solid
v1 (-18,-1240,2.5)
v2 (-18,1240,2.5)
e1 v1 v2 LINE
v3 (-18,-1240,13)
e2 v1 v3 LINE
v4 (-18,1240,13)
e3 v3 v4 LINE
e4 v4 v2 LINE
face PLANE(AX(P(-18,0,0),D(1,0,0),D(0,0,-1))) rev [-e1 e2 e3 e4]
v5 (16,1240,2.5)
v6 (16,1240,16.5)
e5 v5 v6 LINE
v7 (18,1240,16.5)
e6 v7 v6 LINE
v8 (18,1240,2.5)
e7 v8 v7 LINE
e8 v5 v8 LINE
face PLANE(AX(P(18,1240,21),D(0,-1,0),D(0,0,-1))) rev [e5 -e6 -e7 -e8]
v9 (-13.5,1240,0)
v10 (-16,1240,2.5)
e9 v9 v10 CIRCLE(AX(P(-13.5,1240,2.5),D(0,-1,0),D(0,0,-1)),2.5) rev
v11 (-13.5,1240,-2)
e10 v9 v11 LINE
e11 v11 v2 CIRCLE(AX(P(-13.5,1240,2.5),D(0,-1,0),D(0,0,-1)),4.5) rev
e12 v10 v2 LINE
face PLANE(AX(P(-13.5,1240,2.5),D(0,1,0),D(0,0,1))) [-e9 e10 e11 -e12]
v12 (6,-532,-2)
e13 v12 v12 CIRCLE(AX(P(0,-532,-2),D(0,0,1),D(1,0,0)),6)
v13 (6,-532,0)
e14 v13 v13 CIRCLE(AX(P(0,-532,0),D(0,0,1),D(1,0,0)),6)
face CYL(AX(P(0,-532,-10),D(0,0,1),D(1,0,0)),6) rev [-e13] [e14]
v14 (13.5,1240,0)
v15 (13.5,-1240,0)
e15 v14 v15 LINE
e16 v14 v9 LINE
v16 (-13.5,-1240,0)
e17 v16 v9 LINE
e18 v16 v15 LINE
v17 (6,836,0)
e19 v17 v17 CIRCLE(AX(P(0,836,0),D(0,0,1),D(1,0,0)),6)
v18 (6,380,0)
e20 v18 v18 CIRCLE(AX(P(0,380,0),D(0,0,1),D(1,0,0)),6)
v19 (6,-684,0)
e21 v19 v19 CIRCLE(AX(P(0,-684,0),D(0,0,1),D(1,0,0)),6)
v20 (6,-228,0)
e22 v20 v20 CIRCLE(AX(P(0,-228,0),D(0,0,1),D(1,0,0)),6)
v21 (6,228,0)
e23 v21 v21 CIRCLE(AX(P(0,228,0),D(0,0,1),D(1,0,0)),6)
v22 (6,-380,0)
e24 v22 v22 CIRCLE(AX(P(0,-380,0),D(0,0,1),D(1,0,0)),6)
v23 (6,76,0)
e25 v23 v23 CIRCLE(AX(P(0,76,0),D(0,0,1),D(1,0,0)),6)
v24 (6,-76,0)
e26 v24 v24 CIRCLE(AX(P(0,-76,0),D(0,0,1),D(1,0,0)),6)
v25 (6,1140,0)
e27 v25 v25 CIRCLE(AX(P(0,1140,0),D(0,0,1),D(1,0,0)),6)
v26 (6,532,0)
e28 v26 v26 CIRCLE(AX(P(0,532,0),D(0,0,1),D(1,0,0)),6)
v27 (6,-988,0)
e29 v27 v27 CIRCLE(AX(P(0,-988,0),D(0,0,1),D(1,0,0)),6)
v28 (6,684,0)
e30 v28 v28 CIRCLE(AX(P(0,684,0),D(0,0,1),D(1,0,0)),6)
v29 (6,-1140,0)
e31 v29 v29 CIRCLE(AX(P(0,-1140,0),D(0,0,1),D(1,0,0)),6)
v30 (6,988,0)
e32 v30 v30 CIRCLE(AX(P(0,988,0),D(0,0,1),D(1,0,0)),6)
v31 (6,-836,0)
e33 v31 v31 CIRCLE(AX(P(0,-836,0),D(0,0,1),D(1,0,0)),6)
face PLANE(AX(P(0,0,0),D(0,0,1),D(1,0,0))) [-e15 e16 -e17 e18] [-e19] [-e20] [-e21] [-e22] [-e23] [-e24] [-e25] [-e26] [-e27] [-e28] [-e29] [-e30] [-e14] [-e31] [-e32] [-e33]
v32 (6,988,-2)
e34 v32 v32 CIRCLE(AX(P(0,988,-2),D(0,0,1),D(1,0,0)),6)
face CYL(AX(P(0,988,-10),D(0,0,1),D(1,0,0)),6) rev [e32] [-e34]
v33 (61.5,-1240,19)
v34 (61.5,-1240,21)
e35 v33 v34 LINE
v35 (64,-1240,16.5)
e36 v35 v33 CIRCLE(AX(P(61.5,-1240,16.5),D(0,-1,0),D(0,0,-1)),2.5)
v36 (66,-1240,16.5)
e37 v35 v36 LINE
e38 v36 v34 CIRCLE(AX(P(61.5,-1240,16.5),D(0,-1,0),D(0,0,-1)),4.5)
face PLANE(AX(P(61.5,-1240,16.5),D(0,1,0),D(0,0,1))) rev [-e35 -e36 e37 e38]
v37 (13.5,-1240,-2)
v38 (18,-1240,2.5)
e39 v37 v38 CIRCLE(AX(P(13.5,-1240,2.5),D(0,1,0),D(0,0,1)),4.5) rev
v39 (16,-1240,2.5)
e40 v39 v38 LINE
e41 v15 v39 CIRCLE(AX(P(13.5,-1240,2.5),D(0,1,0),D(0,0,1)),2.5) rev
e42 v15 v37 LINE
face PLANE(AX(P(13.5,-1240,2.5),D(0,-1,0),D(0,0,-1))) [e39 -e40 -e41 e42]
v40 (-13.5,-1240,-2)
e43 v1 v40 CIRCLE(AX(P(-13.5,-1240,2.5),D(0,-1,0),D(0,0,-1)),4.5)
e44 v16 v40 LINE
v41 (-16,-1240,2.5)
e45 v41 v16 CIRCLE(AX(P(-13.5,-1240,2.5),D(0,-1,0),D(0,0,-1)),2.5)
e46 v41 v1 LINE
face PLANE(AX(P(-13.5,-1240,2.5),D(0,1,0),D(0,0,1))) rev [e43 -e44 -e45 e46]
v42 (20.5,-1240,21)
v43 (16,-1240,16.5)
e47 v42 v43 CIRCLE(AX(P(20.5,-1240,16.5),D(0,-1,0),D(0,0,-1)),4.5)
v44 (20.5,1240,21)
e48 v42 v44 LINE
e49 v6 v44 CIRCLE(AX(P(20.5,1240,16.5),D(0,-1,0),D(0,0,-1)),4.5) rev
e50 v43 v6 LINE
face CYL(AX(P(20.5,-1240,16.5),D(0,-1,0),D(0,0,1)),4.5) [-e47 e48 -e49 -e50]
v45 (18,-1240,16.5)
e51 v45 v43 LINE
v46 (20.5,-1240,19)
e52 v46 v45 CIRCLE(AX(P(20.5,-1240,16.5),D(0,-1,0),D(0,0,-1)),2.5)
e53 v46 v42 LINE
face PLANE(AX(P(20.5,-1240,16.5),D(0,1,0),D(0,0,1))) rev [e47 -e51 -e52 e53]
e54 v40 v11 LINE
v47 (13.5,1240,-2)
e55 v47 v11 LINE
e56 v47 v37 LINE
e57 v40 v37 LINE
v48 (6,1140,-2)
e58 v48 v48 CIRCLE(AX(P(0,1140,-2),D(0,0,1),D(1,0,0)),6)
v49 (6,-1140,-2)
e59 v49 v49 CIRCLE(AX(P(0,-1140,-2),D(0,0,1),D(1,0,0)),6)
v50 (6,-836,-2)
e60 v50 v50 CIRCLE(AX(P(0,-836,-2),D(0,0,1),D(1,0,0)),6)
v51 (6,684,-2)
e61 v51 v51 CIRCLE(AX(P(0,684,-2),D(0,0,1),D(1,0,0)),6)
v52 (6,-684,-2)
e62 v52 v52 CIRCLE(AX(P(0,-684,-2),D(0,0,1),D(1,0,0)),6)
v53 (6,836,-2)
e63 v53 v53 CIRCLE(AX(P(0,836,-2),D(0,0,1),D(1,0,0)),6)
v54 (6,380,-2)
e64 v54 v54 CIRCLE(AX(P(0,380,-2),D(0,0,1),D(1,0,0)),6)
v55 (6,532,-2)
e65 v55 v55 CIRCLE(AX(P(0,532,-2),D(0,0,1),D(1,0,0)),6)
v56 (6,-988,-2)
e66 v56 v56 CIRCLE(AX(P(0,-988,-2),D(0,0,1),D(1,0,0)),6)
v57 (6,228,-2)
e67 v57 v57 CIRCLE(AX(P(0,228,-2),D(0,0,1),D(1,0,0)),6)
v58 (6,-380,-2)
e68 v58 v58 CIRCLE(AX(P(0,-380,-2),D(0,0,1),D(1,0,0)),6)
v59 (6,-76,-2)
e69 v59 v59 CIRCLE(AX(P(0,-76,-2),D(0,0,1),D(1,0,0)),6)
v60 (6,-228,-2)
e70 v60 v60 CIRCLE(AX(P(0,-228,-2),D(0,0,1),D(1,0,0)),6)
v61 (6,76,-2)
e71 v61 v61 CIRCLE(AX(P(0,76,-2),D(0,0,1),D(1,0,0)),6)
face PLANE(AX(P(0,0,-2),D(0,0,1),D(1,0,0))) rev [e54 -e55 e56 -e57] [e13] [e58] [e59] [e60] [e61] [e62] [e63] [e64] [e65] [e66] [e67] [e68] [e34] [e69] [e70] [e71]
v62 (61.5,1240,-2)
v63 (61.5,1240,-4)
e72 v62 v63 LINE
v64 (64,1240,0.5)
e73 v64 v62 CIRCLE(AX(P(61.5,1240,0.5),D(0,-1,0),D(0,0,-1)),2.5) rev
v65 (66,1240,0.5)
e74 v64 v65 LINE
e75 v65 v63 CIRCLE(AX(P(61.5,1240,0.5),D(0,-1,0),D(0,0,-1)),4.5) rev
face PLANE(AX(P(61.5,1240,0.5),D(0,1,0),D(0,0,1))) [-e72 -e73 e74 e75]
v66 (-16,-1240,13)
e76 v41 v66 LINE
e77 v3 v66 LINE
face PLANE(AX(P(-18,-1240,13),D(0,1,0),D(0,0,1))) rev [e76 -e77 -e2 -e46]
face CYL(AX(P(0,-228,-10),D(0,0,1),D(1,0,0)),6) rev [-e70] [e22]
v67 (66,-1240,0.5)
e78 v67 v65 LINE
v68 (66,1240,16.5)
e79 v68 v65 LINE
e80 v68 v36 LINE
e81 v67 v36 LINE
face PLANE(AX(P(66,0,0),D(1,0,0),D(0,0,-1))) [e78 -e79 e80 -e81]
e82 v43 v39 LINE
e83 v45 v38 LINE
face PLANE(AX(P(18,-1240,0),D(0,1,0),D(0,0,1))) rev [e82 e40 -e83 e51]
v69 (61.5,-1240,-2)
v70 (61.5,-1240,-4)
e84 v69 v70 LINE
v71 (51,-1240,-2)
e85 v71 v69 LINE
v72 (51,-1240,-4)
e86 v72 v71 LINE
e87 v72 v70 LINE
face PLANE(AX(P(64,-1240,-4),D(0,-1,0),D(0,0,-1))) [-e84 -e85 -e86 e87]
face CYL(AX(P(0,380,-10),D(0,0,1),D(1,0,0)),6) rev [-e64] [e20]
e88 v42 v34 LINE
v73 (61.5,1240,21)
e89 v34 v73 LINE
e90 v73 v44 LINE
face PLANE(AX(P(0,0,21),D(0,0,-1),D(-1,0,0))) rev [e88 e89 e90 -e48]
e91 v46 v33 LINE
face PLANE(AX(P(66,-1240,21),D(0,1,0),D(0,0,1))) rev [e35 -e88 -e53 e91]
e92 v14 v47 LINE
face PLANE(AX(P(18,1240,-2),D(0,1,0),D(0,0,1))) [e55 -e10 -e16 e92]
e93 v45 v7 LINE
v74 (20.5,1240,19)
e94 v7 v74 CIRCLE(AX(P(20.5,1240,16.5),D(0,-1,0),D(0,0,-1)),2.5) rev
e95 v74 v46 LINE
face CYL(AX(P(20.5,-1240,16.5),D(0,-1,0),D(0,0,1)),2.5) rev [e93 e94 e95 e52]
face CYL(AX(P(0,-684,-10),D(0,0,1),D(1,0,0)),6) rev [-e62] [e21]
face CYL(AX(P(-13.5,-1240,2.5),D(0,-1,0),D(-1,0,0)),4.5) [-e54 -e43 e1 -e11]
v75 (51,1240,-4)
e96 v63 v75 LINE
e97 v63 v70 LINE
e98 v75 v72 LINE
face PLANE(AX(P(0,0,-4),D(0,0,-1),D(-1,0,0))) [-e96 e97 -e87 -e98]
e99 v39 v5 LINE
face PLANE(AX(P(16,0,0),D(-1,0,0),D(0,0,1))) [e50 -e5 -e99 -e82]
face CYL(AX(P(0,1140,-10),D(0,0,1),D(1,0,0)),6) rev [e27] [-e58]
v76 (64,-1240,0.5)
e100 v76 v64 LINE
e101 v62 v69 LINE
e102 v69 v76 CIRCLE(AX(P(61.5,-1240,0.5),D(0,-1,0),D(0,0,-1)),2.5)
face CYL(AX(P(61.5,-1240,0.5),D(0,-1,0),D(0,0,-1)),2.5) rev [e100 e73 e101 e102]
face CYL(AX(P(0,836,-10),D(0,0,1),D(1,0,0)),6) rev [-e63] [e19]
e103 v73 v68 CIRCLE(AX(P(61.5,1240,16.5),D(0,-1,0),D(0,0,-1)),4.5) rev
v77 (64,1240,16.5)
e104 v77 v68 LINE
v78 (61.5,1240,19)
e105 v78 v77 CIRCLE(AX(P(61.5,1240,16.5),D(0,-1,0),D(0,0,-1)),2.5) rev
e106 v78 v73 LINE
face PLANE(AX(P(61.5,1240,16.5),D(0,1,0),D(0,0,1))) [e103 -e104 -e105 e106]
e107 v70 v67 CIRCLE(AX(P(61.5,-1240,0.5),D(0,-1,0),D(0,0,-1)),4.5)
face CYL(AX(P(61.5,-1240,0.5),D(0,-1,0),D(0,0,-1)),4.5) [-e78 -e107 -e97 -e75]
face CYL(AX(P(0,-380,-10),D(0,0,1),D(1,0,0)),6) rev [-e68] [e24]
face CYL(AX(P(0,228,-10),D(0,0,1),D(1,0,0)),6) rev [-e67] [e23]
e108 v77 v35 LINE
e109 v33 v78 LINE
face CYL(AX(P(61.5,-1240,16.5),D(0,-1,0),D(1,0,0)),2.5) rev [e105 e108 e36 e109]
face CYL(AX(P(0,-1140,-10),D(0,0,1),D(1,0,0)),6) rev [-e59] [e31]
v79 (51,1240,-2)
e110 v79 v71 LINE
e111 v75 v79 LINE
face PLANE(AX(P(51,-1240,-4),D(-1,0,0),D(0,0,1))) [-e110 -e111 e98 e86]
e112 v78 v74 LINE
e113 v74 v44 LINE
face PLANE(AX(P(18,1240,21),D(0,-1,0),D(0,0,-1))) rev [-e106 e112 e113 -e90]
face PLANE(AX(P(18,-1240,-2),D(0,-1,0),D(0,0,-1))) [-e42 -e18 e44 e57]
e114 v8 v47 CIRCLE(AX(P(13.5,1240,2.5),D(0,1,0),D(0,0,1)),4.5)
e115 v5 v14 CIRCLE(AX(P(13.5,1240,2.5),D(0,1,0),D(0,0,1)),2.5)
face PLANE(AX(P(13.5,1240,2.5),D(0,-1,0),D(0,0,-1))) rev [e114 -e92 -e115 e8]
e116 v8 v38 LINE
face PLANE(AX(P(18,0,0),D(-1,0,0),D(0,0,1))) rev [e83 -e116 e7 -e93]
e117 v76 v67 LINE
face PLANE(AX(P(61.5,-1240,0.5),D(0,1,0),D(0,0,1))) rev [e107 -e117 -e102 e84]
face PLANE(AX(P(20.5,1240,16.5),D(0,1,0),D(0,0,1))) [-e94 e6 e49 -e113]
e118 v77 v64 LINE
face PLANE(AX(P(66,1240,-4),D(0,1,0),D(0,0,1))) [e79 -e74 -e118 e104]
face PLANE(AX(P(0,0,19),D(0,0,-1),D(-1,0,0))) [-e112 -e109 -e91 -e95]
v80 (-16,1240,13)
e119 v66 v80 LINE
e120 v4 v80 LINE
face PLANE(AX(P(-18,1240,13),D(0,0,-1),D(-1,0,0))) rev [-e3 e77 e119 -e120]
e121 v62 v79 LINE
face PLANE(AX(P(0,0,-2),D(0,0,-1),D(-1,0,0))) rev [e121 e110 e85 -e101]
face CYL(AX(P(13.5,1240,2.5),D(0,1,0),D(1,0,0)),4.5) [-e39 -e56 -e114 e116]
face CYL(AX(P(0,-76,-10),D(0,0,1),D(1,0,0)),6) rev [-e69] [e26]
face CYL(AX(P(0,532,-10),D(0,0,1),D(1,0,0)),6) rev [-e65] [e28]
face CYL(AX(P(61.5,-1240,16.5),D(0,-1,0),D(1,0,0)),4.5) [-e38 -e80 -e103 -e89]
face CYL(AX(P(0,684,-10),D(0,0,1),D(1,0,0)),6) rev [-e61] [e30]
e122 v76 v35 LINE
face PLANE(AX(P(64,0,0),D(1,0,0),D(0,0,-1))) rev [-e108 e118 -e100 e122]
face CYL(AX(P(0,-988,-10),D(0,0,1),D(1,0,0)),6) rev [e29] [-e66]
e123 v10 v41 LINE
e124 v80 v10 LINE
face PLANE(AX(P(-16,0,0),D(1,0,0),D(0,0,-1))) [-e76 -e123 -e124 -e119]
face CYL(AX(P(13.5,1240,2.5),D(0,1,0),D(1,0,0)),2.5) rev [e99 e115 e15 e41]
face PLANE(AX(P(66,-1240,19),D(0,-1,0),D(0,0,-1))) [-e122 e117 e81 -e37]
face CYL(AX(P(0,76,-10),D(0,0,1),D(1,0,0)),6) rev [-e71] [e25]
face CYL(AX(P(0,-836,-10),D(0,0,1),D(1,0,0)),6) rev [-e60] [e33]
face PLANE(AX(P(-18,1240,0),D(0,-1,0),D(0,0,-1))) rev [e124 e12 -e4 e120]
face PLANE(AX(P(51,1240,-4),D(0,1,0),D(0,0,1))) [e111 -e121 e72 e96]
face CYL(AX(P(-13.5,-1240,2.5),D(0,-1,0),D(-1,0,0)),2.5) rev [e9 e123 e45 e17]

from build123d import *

# Parameters (mm, degrees)
SKETCH1_W                    = 36
SKETCH1_H                    = 2480
BASE_FLANGE1_DEPTH           = 2
EDGE_FLANGE1_STRIP_W         = 13
EDGE_FLANGE1_STRIP_H         = 2
EDGE_FLANGE1_STRIP_CUT_DEPTH = 2480
EDGE_FLANGE1_DEPTH           = 2480
EDGE_FLANGE2_STRIP_W         = 13
EDGE_FLANGE2_STRIP_H         = 2
EDGE_FLANGE2_STRIP_CUT_DEPTH = 2480
EDGE_FLANGE2_DEPTH           = 2480
EDGE_FLANGE3_STRIP_W         = 13
EDGE_FLANGE3_STRIP_H         = 2
EDGE_FLANGE3_STRIP_CUT_DEPTH = 2480
EDGE_FLANGE3_DEPTH           = 2480
EDGE_FLANGE4_STRIP_W         = 13
EDGE_FLANGE4_STRIP_H         = 2
EDGE_FLANGE4_STRIP_CUT_DEPTH = 2480
EDGE_FLANGE4_DEPTH           = 2480
EDGE_FLANGE5_STRIP_W         = 13
EDGE_FLANGE5_STRIP_H         = 2
EDGE_FLANGE5_STRIP_CUT_DEPTH = 2480
EDGE_FLANGE5_DEPTH           = 2480
SKETCH21_R                   = 6
CUT_EXTRUDE1_DEPTH           = 10
LPATTERN1_COUNT              = 16
LPATTERN1_PITCH              = 152


# Sheet-metal steps are written as plain solids
with BuildPart() as part:
    # Sketch1 → Base-Flange1 (new body)
    with BuildSketch(Plane.XY):
        Rectangle(SKETCH1_W, SKETCH1_H)
    extrude(amount=-BASE_FLANGE1_DEPTH)

    # Edge-Flange1 strip (across the edge) → Edge-Flange1 strip cut (cut)
    with BuildSketch(Plane(origin=(-18, 1240, 0), x_dir=(1, 0, 0), z_dir=(0, -1, 0))):
        with Locations((-2, -1)):
            Rectangle(EDGE_FLANGE1_STRIP_W, EDGE_FLANGE1_STRIP_H)
    extrude(amount=EDGE_FLANGE1_STRIP_CUT_DEPTH, mode=Mode.SUBTRACT)

    # Edge-Flange1 section (across the edge) → Edge-Flange1 (add)
    with BuildSketch(Plane(origin=(-18, 1240, 0), x_dir=(1, 0, 0), z_dir=(0, -1, 0))):
        with BuildLine():
            Line((0, 2.5), (0, 13))
            Line((0, 13), (2, 13))
            Line((2, 13), (2, 2.5))
            ThreePointArc((2, 2.5), (2.732233047, 0.732233047), (4.5, 0))
            Line((4.5, 0), (4.5, -2))
            ThreePointArc((4.5, -2), (1.318019485, -0.681980515), (0, 2.5))
        make_face()
    extrude(amount=EDGE_FLANGE1_DEPTH)

    # Edge-Flange2 strip (across the edge) → Edge-Flange2 strip cut (cut)
    with BuildSketch(Plane(origin=(18, -1240, 0), x_dir=(-1, 0, 0), z_dir=(0, 1, 0))):
        with Locations((-2, -1)):
            Rectangle(EDGE_FLANGE2_STRIP_W, EDGE_FLANGE2_STRIP_H)
    extrude(amount=EDGE_FLANGE2_STRIP_CUT_DEPTH, mode=Mode.SUBTRACT)

    # Edge-Flange2 section (across the edge) → Edge-Flange2 (add)
    with BuildSketch(Plane(origin=(18, -1240, 0), x_dir=(-1, 0, 0), z_dir=(0, 1, 0))):
        with BuildLine():
            Line((0, 2.5), (0, 21))
            Line((0, 21), (2, 21))
            Line((2, 21), (2, 2.5))
            ThreePointArc((2, 2.5), (2.732233047, 0.732233047), (4.5, 0))
            Line((4.5, 0), (4.5, -2))
            ThreePointArc((4.5, -2), (1.318019485, -0.681980515), (0, 2.5))
        make_face()
    extrude(amount=EDGE_FLANGE2_DEPTH)

    # Edge-Flange3 strip (across the edge) → Edge-Flange3 strip cut (cut)
    with BuildSketch(Plane(origin=(18, 1240, 21), x_dir=(0, 0, -1), z_dir=(0, -1, 0))):
        with Locations((-2, -1)):
            Rectangle(EDGE_FLANGE3_STRIP_W, EDGE_FLANGE3_STRIP_H)
    extrude(amount=EDGE_FLANGE3_STRIP_CUT_DEPTH, mode=Mode.SUBTRACT)

    # Edge-Flange3 section (across the edge) → Edge-Flange3 (add)
    with BuildSketch(Plane(origin=(18, 1240, 21), x_dir=(0, 0, -1), z_dir=(0, -1, 0))):
        with BuildLine():
            Line((0, 2.5), (0, 48))
            Line((0, 48), (2, 48))
            Line((2, 48), (2, 2.5))
            ThreePointArc((2, 2.5), (2.732233047, 0.732233047), (4.5, 0))
            Line((4.5, 0), (4.5, -2))
            ThreePointArc((4.5, -2), (1.318019485, -0.681980515), (0, 2.5))
        make_face()
    extrude(amount=EDGE_FLANGE3_DEPTH)

    # Edge-Flange4 strip (across the edge) → Edge-Flange4 strip cut (cut)
    with BuildSketch(Plane(origin=(66, 1240, 19), x_dir=(-1, 0, 0), z_dir=(0, -1, 0))):
        with Locations((-2, -1)):
            Rectangle(EDGE_FLANGE4_STRIP_W, EDGE_FLANGE4_STRIP_H)
    extrude(amount=EDGE_FLANGE4_STRIP_CUT_DEPTH, mode=Mode.SUBTRACT)

    # Edge-Flange4 section (across the edge) → Edge-Flange4 (add)
    with BuildSketch(Plane(origin=(66, 1240, 19), x_dir=(-1, 0, 0), z_dir=(0, -1, 0))):
        with BuildLine():
            Line((0, 2.5), (0, 23))
            Line((0, 23), (2, 23))
            Line((2, 23), (2, 2.5))
            ThreePointArc((2, 2.5), (2.732233047, 0.732233047), (4.5, 0))
            Line((4.5, 0), (4.5, -2))
            ThreePointArc((4.5, -2), (1.318019485, -0.681980515), (0, 2.5))
        make_face()
    extrude(amount=EDGE_FLANGE4_DEPTH)

    # Edge-Flange5 strip (across the edge) → Edge-Flange5 strip cut (cut)
    with BuildSketch(Plane(origin=(64, 1240, -4), x_dir=(0, 0, 1), z_dir=(0, -1, 0))):
        with Locations((-2, -1)):
            Rectangle(EDGE_FLANGE5_STRIP_W, EDGE_FLANGE5_STRIP_H)
    extrude(amount=EDGE_FLANGE5_STRIP_CUT_DEPTH, mode=Mode.SUBTRACT)

    # Edge-Flange5 section (across the edge) → Edge-Flange5 (add)
    with BuildSketch(Plane(origin=(64, 1240, -4), x_dir=(0, 0, 1), z_dir=(0, -1, 0))):
        with BuildLine():
            Line((0, 2.5), (0, 13))
            Line((0, 13), (2, 13))
            Line((2, 13), (2, 2.5))
            ThreePointArc((2, 2.5), (2.732233047, 0.732233047), (4.5, 0))
            Line((4.5, 0), (4.5, -2))
            ThreePointArc((4.5, -2), (1.318019485, -0.681980515), (0, 2.5))
        make_face()
    extrude(amount=EDGE_FLANGE5_DEPTH)

    # Sketch21 → Cut-Extrude1 (cut)
    with BuildSketch(Plane.XY):
        with Locations((0, 1140)):
            Circle(SKETCH21_R)
    cut_extrude1 = extrude(amount=-CUT_EXTRUDE1_DEPTH, mode=Mode.SUBTRACT)

    # LPattern1: Cut-Extrude1 ×16
    with Locations(*[(0, -i * LPATTERN1_PITCH, 0) for i in range(1, LPATTERN1_COUNT)]):
        add(cut_extrude1, mode=Mode.SUBTRACT)


solid = part.part
